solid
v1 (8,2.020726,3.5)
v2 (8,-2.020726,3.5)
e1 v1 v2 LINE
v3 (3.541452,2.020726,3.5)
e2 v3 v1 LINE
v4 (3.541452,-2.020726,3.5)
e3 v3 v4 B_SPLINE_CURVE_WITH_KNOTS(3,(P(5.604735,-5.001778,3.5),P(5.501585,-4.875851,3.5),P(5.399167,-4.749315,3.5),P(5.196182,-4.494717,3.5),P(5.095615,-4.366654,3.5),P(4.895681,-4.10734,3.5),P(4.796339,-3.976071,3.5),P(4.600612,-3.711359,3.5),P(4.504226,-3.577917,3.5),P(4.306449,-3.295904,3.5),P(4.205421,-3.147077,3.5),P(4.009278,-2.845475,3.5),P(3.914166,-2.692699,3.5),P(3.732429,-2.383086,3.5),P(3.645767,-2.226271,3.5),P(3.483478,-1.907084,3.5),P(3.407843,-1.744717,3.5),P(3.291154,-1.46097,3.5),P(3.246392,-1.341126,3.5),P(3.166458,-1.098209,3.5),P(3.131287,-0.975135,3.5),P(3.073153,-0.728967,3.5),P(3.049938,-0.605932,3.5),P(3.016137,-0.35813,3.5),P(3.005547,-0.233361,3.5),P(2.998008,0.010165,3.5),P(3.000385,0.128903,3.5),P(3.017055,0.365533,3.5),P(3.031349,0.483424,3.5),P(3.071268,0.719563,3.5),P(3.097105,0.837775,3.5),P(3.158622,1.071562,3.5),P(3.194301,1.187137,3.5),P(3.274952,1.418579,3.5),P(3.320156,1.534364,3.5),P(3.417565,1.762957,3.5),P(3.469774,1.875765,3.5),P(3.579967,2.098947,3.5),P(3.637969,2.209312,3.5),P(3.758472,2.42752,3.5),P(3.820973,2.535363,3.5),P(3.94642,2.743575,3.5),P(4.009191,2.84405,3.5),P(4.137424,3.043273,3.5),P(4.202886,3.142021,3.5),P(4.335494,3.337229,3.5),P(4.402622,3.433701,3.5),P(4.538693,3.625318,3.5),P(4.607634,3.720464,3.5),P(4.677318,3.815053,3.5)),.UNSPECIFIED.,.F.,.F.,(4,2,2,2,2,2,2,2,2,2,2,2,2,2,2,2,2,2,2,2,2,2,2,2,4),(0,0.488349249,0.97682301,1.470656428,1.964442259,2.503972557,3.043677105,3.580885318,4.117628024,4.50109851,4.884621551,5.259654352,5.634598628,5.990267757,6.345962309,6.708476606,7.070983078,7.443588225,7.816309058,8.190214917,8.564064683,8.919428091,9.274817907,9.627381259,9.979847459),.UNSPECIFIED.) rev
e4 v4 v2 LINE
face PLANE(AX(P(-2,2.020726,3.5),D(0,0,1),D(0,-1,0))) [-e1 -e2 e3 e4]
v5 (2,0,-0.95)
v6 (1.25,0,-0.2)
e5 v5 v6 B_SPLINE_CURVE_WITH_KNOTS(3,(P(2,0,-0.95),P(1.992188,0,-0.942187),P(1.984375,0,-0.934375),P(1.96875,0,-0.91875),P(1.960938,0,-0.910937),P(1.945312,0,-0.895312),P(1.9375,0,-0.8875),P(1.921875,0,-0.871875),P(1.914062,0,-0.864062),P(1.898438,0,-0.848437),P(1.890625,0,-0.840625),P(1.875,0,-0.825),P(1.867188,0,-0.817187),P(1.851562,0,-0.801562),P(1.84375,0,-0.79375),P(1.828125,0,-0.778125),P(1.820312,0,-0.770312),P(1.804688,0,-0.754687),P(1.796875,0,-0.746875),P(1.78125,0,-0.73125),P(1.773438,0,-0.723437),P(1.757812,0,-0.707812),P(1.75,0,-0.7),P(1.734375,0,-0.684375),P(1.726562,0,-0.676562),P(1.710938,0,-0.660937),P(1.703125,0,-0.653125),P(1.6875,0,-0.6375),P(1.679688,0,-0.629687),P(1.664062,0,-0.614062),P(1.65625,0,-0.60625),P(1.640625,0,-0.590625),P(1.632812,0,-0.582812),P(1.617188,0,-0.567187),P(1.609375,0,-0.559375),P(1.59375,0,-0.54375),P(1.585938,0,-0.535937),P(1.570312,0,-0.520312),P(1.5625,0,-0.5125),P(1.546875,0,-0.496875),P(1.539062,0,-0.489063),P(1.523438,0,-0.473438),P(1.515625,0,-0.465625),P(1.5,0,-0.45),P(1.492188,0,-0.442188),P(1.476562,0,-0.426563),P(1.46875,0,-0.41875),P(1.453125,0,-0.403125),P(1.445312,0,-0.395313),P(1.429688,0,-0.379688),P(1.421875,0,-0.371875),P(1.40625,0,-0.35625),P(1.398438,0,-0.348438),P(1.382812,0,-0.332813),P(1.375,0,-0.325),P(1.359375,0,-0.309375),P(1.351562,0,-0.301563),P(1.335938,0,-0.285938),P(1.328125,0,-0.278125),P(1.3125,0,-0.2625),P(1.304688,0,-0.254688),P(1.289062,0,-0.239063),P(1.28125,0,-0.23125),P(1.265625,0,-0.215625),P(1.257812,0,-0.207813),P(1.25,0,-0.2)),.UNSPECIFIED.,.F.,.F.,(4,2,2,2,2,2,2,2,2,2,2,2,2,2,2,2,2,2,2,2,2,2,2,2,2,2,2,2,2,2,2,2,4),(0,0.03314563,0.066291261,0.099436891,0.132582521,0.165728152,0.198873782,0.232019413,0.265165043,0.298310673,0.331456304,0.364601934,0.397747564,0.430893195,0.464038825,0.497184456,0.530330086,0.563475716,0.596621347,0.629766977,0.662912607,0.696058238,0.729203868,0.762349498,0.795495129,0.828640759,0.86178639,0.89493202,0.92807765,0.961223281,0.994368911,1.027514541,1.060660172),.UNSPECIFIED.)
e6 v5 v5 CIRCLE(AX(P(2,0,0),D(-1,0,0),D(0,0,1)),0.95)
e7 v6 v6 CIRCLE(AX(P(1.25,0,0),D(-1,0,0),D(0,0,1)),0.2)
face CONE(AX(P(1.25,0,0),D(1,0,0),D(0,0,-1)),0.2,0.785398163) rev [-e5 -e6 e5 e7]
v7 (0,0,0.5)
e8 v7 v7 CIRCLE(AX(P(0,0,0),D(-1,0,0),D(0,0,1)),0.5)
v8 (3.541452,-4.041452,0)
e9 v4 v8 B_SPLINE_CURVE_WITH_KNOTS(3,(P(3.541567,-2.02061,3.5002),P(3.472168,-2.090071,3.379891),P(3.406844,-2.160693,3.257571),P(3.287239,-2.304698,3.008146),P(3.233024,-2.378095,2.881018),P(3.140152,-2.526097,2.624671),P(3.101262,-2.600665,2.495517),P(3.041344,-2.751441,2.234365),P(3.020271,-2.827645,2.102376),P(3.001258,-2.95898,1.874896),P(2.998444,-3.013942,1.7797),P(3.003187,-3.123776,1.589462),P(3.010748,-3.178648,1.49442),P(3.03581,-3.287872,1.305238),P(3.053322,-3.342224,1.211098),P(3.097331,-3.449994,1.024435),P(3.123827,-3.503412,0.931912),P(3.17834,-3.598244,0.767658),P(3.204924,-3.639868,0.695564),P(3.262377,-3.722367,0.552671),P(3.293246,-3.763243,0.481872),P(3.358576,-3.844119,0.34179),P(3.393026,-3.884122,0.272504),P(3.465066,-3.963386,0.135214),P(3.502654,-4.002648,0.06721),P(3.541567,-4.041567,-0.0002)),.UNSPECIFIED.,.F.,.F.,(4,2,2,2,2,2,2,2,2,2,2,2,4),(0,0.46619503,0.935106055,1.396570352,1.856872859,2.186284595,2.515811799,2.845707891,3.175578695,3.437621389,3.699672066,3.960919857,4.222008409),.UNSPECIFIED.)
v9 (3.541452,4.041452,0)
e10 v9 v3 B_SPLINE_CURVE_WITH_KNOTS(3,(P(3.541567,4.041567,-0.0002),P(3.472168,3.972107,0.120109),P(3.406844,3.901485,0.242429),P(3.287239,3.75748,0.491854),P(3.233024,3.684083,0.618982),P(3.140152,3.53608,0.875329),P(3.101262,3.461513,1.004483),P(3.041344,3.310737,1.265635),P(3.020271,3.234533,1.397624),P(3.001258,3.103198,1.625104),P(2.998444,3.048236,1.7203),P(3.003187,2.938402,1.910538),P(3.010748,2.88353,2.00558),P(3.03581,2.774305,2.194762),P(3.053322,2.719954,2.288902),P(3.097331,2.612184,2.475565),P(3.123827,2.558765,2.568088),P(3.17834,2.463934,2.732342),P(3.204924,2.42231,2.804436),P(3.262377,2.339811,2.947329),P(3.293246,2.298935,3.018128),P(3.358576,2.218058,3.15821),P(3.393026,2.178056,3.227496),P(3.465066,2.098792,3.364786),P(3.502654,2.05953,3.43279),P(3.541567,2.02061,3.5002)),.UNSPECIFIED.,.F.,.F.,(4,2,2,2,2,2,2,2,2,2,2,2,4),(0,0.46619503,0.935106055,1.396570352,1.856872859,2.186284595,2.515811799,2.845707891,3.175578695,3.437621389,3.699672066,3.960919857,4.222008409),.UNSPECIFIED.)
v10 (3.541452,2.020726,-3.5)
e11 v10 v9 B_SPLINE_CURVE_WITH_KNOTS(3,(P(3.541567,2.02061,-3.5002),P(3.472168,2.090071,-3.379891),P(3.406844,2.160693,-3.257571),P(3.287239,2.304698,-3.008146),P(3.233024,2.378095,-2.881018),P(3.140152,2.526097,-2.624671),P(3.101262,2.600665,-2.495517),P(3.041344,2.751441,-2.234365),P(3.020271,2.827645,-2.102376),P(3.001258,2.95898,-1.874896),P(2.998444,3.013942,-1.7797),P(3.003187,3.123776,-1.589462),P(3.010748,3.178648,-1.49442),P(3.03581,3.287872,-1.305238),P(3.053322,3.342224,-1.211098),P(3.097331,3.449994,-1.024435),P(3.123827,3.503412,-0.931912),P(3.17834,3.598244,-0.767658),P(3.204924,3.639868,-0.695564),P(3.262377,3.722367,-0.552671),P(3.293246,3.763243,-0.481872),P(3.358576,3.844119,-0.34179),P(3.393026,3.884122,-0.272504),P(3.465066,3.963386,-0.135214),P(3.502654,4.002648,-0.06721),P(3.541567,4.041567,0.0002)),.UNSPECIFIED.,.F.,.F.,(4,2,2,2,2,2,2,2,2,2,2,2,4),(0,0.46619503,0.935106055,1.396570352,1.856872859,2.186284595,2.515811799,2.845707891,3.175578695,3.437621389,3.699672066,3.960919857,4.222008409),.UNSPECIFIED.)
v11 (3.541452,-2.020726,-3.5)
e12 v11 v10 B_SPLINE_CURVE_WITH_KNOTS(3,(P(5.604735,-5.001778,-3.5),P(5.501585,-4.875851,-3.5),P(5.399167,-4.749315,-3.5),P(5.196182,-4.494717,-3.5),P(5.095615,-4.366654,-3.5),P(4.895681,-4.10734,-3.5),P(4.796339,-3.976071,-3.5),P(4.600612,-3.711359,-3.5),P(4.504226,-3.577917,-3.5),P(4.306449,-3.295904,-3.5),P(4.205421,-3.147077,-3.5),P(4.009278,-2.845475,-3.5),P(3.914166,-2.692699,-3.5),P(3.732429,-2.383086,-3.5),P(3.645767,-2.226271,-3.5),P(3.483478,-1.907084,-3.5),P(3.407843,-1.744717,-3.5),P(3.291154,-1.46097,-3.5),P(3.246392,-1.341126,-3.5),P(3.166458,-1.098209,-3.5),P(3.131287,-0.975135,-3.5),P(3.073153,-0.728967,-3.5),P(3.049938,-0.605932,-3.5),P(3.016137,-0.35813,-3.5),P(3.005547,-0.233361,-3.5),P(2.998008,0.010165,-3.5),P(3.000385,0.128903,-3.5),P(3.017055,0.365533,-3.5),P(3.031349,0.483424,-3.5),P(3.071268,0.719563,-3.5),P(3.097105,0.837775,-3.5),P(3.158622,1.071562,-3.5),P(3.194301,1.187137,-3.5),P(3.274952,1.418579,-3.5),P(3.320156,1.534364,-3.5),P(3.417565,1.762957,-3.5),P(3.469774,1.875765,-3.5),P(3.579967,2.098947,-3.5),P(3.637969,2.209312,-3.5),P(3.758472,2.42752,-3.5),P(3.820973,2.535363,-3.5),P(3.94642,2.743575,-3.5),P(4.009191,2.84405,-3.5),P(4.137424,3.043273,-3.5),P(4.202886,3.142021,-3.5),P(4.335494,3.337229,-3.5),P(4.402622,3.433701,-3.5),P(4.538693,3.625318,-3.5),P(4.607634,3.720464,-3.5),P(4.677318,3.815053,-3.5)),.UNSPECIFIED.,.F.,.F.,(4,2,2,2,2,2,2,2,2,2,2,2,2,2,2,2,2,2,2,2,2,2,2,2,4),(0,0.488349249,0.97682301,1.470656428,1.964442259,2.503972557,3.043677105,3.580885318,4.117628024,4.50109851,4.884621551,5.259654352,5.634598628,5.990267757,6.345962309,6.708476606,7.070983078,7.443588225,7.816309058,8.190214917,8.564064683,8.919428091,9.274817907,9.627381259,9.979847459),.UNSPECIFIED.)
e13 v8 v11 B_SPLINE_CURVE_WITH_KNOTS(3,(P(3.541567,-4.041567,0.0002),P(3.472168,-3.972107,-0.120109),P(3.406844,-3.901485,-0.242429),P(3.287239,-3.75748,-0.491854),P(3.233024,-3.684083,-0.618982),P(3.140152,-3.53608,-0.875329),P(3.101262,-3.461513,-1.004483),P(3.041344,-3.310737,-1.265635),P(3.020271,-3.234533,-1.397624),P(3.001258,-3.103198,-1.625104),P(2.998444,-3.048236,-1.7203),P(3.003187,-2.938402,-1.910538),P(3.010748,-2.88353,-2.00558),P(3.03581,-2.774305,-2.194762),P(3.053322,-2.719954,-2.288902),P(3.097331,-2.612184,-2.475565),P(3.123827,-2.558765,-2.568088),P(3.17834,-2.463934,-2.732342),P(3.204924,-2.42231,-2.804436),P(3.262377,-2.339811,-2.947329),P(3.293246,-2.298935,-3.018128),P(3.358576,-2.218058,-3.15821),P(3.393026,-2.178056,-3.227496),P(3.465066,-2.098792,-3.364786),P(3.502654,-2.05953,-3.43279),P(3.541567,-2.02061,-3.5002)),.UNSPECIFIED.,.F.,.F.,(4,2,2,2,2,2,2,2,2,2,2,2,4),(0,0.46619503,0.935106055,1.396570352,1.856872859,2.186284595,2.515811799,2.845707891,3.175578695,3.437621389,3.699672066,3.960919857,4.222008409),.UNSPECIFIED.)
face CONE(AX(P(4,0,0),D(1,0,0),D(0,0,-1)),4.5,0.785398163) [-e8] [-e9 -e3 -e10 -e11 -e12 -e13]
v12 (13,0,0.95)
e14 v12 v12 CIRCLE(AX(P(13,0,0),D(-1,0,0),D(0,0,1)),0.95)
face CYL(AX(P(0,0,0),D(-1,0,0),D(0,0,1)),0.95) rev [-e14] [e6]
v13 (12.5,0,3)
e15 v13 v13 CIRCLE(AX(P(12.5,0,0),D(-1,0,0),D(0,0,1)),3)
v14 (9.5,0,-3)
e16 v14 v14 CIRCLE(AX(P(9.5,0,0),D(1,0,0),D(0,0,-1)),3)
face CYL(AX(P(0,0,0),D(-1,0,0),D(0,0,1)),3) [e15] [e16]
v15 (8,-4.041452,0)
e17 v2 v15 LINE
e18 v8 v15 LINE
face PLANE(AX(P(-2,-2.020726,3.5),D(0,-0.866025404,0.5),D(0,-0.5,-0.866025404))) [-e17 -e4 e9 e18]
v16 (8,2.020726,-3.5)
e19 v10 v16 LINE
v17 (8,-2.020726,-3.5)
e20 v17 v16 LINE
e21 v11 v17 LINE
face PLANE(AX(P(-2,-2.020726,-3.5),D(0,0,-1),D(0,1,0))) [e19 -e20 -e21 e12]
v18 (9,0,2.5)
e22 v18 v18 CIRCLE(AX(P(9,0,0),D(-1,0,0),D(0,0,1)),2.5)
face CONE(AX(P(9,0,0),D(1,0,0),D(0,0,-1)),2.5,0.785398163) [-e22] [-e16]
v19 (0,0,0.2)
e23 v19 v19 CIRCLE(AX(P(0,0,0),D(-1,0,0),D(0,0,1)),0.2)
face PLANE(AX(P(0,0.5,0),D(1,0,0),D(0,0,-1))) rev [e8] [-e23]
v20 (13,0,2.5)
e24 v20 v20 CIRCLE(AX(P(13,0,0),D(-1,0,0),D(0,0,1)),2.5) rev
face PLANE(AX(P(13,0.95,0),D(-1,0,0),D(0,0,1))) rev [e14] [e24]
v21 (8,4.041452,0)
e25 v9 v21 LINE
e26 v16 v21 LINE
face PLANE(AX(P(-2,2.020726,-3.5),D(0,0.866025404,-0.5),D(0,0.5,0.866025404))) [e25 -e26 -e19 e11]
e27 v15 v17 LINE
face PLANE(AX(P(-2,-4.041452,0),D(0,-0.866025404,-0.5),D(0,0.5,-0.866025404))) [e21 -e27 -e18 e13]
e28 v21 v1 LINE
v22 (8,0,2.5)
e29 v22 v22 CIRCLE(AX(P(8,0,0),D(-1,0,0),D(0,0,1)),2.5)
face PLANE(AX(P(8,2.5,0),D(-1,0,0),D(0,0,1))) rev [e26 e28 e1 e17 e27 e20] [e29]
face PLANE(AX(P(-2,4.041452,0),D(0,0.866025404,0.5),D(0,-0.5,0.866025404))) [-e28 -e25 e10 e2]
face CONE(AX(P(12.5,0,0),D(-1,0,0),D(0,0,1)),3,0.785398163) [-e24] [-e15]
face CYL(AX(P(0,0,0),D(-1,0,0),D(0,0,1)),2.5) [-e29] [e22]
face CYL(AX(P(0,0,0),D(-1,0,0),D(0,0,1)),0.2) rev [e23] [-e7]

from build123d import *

# Parameters (mm, degrees)
ESQUISSE2_OUTSIDE_W     = 14.638
ESQUISSE2_OUTSIDE_H     = 14.638
ENL_V_MAT_EXTRU_1_DEPTH = 10
CHANFREIN1_SIZE         = 0.5


with BuildPart() as part:
    # Esquisse1 → Révolution1 (revolve)
    with BuildSketch(Plane.XY, mode=Mode.PRIVATE) as r_volution1_sk:
        Polygon((1.25, 0.2), (2, 0.95), (13, 0.95), (13, 3), (9, 3), (9, 2.5), (8, 2.5), (8, 4.5), (4, 4.5), (0, 0.5), (0, 0.2), align=None)
    revolve(r_volution1_sk.sketch.rotate(Axis((0, 0, 0), (1, 0, 0)), 90), axis=Axis((0, 0, 0), (1, 0, 0)))

    # Esquisse2 outside → Enlèv. mat.-Extru.1 (cut)
    with BuildSketch(Plane(origin=(8, 0, 0), x_dir=(0, 0, -1), z_dir=(1, 0, 0))):
        Rectangle(ESQUISSE2_OUTSIDE_W, ESQUISSE2_OUTSIDE_H)
        Polygon((-3.5, -2.020725942), (0, -4.041451884), (3.5, -2.020725942), (3.5, 2.020725942), (0, 4.041451884), (-3.5, 2.020725942), align=None, mode=Mode.SUBTRACT)
    extrude(amount=-ENL_V_MAT_EXTRU_1_DEPTH, mode=Mode.SUBTRACT)

    # Chanfrein1
    chanfrein1_edges = [part.edges().sort_by_distance(p)[0] for p in [
        (9, 0, -3),
        (13, 0, -3),
    ]]
    chamfer(chanfrein1_edges, length=CHANFREIN1_SIZE - 0.0001)  # a hair under: the kernel refuses the full size


solid = part.part
